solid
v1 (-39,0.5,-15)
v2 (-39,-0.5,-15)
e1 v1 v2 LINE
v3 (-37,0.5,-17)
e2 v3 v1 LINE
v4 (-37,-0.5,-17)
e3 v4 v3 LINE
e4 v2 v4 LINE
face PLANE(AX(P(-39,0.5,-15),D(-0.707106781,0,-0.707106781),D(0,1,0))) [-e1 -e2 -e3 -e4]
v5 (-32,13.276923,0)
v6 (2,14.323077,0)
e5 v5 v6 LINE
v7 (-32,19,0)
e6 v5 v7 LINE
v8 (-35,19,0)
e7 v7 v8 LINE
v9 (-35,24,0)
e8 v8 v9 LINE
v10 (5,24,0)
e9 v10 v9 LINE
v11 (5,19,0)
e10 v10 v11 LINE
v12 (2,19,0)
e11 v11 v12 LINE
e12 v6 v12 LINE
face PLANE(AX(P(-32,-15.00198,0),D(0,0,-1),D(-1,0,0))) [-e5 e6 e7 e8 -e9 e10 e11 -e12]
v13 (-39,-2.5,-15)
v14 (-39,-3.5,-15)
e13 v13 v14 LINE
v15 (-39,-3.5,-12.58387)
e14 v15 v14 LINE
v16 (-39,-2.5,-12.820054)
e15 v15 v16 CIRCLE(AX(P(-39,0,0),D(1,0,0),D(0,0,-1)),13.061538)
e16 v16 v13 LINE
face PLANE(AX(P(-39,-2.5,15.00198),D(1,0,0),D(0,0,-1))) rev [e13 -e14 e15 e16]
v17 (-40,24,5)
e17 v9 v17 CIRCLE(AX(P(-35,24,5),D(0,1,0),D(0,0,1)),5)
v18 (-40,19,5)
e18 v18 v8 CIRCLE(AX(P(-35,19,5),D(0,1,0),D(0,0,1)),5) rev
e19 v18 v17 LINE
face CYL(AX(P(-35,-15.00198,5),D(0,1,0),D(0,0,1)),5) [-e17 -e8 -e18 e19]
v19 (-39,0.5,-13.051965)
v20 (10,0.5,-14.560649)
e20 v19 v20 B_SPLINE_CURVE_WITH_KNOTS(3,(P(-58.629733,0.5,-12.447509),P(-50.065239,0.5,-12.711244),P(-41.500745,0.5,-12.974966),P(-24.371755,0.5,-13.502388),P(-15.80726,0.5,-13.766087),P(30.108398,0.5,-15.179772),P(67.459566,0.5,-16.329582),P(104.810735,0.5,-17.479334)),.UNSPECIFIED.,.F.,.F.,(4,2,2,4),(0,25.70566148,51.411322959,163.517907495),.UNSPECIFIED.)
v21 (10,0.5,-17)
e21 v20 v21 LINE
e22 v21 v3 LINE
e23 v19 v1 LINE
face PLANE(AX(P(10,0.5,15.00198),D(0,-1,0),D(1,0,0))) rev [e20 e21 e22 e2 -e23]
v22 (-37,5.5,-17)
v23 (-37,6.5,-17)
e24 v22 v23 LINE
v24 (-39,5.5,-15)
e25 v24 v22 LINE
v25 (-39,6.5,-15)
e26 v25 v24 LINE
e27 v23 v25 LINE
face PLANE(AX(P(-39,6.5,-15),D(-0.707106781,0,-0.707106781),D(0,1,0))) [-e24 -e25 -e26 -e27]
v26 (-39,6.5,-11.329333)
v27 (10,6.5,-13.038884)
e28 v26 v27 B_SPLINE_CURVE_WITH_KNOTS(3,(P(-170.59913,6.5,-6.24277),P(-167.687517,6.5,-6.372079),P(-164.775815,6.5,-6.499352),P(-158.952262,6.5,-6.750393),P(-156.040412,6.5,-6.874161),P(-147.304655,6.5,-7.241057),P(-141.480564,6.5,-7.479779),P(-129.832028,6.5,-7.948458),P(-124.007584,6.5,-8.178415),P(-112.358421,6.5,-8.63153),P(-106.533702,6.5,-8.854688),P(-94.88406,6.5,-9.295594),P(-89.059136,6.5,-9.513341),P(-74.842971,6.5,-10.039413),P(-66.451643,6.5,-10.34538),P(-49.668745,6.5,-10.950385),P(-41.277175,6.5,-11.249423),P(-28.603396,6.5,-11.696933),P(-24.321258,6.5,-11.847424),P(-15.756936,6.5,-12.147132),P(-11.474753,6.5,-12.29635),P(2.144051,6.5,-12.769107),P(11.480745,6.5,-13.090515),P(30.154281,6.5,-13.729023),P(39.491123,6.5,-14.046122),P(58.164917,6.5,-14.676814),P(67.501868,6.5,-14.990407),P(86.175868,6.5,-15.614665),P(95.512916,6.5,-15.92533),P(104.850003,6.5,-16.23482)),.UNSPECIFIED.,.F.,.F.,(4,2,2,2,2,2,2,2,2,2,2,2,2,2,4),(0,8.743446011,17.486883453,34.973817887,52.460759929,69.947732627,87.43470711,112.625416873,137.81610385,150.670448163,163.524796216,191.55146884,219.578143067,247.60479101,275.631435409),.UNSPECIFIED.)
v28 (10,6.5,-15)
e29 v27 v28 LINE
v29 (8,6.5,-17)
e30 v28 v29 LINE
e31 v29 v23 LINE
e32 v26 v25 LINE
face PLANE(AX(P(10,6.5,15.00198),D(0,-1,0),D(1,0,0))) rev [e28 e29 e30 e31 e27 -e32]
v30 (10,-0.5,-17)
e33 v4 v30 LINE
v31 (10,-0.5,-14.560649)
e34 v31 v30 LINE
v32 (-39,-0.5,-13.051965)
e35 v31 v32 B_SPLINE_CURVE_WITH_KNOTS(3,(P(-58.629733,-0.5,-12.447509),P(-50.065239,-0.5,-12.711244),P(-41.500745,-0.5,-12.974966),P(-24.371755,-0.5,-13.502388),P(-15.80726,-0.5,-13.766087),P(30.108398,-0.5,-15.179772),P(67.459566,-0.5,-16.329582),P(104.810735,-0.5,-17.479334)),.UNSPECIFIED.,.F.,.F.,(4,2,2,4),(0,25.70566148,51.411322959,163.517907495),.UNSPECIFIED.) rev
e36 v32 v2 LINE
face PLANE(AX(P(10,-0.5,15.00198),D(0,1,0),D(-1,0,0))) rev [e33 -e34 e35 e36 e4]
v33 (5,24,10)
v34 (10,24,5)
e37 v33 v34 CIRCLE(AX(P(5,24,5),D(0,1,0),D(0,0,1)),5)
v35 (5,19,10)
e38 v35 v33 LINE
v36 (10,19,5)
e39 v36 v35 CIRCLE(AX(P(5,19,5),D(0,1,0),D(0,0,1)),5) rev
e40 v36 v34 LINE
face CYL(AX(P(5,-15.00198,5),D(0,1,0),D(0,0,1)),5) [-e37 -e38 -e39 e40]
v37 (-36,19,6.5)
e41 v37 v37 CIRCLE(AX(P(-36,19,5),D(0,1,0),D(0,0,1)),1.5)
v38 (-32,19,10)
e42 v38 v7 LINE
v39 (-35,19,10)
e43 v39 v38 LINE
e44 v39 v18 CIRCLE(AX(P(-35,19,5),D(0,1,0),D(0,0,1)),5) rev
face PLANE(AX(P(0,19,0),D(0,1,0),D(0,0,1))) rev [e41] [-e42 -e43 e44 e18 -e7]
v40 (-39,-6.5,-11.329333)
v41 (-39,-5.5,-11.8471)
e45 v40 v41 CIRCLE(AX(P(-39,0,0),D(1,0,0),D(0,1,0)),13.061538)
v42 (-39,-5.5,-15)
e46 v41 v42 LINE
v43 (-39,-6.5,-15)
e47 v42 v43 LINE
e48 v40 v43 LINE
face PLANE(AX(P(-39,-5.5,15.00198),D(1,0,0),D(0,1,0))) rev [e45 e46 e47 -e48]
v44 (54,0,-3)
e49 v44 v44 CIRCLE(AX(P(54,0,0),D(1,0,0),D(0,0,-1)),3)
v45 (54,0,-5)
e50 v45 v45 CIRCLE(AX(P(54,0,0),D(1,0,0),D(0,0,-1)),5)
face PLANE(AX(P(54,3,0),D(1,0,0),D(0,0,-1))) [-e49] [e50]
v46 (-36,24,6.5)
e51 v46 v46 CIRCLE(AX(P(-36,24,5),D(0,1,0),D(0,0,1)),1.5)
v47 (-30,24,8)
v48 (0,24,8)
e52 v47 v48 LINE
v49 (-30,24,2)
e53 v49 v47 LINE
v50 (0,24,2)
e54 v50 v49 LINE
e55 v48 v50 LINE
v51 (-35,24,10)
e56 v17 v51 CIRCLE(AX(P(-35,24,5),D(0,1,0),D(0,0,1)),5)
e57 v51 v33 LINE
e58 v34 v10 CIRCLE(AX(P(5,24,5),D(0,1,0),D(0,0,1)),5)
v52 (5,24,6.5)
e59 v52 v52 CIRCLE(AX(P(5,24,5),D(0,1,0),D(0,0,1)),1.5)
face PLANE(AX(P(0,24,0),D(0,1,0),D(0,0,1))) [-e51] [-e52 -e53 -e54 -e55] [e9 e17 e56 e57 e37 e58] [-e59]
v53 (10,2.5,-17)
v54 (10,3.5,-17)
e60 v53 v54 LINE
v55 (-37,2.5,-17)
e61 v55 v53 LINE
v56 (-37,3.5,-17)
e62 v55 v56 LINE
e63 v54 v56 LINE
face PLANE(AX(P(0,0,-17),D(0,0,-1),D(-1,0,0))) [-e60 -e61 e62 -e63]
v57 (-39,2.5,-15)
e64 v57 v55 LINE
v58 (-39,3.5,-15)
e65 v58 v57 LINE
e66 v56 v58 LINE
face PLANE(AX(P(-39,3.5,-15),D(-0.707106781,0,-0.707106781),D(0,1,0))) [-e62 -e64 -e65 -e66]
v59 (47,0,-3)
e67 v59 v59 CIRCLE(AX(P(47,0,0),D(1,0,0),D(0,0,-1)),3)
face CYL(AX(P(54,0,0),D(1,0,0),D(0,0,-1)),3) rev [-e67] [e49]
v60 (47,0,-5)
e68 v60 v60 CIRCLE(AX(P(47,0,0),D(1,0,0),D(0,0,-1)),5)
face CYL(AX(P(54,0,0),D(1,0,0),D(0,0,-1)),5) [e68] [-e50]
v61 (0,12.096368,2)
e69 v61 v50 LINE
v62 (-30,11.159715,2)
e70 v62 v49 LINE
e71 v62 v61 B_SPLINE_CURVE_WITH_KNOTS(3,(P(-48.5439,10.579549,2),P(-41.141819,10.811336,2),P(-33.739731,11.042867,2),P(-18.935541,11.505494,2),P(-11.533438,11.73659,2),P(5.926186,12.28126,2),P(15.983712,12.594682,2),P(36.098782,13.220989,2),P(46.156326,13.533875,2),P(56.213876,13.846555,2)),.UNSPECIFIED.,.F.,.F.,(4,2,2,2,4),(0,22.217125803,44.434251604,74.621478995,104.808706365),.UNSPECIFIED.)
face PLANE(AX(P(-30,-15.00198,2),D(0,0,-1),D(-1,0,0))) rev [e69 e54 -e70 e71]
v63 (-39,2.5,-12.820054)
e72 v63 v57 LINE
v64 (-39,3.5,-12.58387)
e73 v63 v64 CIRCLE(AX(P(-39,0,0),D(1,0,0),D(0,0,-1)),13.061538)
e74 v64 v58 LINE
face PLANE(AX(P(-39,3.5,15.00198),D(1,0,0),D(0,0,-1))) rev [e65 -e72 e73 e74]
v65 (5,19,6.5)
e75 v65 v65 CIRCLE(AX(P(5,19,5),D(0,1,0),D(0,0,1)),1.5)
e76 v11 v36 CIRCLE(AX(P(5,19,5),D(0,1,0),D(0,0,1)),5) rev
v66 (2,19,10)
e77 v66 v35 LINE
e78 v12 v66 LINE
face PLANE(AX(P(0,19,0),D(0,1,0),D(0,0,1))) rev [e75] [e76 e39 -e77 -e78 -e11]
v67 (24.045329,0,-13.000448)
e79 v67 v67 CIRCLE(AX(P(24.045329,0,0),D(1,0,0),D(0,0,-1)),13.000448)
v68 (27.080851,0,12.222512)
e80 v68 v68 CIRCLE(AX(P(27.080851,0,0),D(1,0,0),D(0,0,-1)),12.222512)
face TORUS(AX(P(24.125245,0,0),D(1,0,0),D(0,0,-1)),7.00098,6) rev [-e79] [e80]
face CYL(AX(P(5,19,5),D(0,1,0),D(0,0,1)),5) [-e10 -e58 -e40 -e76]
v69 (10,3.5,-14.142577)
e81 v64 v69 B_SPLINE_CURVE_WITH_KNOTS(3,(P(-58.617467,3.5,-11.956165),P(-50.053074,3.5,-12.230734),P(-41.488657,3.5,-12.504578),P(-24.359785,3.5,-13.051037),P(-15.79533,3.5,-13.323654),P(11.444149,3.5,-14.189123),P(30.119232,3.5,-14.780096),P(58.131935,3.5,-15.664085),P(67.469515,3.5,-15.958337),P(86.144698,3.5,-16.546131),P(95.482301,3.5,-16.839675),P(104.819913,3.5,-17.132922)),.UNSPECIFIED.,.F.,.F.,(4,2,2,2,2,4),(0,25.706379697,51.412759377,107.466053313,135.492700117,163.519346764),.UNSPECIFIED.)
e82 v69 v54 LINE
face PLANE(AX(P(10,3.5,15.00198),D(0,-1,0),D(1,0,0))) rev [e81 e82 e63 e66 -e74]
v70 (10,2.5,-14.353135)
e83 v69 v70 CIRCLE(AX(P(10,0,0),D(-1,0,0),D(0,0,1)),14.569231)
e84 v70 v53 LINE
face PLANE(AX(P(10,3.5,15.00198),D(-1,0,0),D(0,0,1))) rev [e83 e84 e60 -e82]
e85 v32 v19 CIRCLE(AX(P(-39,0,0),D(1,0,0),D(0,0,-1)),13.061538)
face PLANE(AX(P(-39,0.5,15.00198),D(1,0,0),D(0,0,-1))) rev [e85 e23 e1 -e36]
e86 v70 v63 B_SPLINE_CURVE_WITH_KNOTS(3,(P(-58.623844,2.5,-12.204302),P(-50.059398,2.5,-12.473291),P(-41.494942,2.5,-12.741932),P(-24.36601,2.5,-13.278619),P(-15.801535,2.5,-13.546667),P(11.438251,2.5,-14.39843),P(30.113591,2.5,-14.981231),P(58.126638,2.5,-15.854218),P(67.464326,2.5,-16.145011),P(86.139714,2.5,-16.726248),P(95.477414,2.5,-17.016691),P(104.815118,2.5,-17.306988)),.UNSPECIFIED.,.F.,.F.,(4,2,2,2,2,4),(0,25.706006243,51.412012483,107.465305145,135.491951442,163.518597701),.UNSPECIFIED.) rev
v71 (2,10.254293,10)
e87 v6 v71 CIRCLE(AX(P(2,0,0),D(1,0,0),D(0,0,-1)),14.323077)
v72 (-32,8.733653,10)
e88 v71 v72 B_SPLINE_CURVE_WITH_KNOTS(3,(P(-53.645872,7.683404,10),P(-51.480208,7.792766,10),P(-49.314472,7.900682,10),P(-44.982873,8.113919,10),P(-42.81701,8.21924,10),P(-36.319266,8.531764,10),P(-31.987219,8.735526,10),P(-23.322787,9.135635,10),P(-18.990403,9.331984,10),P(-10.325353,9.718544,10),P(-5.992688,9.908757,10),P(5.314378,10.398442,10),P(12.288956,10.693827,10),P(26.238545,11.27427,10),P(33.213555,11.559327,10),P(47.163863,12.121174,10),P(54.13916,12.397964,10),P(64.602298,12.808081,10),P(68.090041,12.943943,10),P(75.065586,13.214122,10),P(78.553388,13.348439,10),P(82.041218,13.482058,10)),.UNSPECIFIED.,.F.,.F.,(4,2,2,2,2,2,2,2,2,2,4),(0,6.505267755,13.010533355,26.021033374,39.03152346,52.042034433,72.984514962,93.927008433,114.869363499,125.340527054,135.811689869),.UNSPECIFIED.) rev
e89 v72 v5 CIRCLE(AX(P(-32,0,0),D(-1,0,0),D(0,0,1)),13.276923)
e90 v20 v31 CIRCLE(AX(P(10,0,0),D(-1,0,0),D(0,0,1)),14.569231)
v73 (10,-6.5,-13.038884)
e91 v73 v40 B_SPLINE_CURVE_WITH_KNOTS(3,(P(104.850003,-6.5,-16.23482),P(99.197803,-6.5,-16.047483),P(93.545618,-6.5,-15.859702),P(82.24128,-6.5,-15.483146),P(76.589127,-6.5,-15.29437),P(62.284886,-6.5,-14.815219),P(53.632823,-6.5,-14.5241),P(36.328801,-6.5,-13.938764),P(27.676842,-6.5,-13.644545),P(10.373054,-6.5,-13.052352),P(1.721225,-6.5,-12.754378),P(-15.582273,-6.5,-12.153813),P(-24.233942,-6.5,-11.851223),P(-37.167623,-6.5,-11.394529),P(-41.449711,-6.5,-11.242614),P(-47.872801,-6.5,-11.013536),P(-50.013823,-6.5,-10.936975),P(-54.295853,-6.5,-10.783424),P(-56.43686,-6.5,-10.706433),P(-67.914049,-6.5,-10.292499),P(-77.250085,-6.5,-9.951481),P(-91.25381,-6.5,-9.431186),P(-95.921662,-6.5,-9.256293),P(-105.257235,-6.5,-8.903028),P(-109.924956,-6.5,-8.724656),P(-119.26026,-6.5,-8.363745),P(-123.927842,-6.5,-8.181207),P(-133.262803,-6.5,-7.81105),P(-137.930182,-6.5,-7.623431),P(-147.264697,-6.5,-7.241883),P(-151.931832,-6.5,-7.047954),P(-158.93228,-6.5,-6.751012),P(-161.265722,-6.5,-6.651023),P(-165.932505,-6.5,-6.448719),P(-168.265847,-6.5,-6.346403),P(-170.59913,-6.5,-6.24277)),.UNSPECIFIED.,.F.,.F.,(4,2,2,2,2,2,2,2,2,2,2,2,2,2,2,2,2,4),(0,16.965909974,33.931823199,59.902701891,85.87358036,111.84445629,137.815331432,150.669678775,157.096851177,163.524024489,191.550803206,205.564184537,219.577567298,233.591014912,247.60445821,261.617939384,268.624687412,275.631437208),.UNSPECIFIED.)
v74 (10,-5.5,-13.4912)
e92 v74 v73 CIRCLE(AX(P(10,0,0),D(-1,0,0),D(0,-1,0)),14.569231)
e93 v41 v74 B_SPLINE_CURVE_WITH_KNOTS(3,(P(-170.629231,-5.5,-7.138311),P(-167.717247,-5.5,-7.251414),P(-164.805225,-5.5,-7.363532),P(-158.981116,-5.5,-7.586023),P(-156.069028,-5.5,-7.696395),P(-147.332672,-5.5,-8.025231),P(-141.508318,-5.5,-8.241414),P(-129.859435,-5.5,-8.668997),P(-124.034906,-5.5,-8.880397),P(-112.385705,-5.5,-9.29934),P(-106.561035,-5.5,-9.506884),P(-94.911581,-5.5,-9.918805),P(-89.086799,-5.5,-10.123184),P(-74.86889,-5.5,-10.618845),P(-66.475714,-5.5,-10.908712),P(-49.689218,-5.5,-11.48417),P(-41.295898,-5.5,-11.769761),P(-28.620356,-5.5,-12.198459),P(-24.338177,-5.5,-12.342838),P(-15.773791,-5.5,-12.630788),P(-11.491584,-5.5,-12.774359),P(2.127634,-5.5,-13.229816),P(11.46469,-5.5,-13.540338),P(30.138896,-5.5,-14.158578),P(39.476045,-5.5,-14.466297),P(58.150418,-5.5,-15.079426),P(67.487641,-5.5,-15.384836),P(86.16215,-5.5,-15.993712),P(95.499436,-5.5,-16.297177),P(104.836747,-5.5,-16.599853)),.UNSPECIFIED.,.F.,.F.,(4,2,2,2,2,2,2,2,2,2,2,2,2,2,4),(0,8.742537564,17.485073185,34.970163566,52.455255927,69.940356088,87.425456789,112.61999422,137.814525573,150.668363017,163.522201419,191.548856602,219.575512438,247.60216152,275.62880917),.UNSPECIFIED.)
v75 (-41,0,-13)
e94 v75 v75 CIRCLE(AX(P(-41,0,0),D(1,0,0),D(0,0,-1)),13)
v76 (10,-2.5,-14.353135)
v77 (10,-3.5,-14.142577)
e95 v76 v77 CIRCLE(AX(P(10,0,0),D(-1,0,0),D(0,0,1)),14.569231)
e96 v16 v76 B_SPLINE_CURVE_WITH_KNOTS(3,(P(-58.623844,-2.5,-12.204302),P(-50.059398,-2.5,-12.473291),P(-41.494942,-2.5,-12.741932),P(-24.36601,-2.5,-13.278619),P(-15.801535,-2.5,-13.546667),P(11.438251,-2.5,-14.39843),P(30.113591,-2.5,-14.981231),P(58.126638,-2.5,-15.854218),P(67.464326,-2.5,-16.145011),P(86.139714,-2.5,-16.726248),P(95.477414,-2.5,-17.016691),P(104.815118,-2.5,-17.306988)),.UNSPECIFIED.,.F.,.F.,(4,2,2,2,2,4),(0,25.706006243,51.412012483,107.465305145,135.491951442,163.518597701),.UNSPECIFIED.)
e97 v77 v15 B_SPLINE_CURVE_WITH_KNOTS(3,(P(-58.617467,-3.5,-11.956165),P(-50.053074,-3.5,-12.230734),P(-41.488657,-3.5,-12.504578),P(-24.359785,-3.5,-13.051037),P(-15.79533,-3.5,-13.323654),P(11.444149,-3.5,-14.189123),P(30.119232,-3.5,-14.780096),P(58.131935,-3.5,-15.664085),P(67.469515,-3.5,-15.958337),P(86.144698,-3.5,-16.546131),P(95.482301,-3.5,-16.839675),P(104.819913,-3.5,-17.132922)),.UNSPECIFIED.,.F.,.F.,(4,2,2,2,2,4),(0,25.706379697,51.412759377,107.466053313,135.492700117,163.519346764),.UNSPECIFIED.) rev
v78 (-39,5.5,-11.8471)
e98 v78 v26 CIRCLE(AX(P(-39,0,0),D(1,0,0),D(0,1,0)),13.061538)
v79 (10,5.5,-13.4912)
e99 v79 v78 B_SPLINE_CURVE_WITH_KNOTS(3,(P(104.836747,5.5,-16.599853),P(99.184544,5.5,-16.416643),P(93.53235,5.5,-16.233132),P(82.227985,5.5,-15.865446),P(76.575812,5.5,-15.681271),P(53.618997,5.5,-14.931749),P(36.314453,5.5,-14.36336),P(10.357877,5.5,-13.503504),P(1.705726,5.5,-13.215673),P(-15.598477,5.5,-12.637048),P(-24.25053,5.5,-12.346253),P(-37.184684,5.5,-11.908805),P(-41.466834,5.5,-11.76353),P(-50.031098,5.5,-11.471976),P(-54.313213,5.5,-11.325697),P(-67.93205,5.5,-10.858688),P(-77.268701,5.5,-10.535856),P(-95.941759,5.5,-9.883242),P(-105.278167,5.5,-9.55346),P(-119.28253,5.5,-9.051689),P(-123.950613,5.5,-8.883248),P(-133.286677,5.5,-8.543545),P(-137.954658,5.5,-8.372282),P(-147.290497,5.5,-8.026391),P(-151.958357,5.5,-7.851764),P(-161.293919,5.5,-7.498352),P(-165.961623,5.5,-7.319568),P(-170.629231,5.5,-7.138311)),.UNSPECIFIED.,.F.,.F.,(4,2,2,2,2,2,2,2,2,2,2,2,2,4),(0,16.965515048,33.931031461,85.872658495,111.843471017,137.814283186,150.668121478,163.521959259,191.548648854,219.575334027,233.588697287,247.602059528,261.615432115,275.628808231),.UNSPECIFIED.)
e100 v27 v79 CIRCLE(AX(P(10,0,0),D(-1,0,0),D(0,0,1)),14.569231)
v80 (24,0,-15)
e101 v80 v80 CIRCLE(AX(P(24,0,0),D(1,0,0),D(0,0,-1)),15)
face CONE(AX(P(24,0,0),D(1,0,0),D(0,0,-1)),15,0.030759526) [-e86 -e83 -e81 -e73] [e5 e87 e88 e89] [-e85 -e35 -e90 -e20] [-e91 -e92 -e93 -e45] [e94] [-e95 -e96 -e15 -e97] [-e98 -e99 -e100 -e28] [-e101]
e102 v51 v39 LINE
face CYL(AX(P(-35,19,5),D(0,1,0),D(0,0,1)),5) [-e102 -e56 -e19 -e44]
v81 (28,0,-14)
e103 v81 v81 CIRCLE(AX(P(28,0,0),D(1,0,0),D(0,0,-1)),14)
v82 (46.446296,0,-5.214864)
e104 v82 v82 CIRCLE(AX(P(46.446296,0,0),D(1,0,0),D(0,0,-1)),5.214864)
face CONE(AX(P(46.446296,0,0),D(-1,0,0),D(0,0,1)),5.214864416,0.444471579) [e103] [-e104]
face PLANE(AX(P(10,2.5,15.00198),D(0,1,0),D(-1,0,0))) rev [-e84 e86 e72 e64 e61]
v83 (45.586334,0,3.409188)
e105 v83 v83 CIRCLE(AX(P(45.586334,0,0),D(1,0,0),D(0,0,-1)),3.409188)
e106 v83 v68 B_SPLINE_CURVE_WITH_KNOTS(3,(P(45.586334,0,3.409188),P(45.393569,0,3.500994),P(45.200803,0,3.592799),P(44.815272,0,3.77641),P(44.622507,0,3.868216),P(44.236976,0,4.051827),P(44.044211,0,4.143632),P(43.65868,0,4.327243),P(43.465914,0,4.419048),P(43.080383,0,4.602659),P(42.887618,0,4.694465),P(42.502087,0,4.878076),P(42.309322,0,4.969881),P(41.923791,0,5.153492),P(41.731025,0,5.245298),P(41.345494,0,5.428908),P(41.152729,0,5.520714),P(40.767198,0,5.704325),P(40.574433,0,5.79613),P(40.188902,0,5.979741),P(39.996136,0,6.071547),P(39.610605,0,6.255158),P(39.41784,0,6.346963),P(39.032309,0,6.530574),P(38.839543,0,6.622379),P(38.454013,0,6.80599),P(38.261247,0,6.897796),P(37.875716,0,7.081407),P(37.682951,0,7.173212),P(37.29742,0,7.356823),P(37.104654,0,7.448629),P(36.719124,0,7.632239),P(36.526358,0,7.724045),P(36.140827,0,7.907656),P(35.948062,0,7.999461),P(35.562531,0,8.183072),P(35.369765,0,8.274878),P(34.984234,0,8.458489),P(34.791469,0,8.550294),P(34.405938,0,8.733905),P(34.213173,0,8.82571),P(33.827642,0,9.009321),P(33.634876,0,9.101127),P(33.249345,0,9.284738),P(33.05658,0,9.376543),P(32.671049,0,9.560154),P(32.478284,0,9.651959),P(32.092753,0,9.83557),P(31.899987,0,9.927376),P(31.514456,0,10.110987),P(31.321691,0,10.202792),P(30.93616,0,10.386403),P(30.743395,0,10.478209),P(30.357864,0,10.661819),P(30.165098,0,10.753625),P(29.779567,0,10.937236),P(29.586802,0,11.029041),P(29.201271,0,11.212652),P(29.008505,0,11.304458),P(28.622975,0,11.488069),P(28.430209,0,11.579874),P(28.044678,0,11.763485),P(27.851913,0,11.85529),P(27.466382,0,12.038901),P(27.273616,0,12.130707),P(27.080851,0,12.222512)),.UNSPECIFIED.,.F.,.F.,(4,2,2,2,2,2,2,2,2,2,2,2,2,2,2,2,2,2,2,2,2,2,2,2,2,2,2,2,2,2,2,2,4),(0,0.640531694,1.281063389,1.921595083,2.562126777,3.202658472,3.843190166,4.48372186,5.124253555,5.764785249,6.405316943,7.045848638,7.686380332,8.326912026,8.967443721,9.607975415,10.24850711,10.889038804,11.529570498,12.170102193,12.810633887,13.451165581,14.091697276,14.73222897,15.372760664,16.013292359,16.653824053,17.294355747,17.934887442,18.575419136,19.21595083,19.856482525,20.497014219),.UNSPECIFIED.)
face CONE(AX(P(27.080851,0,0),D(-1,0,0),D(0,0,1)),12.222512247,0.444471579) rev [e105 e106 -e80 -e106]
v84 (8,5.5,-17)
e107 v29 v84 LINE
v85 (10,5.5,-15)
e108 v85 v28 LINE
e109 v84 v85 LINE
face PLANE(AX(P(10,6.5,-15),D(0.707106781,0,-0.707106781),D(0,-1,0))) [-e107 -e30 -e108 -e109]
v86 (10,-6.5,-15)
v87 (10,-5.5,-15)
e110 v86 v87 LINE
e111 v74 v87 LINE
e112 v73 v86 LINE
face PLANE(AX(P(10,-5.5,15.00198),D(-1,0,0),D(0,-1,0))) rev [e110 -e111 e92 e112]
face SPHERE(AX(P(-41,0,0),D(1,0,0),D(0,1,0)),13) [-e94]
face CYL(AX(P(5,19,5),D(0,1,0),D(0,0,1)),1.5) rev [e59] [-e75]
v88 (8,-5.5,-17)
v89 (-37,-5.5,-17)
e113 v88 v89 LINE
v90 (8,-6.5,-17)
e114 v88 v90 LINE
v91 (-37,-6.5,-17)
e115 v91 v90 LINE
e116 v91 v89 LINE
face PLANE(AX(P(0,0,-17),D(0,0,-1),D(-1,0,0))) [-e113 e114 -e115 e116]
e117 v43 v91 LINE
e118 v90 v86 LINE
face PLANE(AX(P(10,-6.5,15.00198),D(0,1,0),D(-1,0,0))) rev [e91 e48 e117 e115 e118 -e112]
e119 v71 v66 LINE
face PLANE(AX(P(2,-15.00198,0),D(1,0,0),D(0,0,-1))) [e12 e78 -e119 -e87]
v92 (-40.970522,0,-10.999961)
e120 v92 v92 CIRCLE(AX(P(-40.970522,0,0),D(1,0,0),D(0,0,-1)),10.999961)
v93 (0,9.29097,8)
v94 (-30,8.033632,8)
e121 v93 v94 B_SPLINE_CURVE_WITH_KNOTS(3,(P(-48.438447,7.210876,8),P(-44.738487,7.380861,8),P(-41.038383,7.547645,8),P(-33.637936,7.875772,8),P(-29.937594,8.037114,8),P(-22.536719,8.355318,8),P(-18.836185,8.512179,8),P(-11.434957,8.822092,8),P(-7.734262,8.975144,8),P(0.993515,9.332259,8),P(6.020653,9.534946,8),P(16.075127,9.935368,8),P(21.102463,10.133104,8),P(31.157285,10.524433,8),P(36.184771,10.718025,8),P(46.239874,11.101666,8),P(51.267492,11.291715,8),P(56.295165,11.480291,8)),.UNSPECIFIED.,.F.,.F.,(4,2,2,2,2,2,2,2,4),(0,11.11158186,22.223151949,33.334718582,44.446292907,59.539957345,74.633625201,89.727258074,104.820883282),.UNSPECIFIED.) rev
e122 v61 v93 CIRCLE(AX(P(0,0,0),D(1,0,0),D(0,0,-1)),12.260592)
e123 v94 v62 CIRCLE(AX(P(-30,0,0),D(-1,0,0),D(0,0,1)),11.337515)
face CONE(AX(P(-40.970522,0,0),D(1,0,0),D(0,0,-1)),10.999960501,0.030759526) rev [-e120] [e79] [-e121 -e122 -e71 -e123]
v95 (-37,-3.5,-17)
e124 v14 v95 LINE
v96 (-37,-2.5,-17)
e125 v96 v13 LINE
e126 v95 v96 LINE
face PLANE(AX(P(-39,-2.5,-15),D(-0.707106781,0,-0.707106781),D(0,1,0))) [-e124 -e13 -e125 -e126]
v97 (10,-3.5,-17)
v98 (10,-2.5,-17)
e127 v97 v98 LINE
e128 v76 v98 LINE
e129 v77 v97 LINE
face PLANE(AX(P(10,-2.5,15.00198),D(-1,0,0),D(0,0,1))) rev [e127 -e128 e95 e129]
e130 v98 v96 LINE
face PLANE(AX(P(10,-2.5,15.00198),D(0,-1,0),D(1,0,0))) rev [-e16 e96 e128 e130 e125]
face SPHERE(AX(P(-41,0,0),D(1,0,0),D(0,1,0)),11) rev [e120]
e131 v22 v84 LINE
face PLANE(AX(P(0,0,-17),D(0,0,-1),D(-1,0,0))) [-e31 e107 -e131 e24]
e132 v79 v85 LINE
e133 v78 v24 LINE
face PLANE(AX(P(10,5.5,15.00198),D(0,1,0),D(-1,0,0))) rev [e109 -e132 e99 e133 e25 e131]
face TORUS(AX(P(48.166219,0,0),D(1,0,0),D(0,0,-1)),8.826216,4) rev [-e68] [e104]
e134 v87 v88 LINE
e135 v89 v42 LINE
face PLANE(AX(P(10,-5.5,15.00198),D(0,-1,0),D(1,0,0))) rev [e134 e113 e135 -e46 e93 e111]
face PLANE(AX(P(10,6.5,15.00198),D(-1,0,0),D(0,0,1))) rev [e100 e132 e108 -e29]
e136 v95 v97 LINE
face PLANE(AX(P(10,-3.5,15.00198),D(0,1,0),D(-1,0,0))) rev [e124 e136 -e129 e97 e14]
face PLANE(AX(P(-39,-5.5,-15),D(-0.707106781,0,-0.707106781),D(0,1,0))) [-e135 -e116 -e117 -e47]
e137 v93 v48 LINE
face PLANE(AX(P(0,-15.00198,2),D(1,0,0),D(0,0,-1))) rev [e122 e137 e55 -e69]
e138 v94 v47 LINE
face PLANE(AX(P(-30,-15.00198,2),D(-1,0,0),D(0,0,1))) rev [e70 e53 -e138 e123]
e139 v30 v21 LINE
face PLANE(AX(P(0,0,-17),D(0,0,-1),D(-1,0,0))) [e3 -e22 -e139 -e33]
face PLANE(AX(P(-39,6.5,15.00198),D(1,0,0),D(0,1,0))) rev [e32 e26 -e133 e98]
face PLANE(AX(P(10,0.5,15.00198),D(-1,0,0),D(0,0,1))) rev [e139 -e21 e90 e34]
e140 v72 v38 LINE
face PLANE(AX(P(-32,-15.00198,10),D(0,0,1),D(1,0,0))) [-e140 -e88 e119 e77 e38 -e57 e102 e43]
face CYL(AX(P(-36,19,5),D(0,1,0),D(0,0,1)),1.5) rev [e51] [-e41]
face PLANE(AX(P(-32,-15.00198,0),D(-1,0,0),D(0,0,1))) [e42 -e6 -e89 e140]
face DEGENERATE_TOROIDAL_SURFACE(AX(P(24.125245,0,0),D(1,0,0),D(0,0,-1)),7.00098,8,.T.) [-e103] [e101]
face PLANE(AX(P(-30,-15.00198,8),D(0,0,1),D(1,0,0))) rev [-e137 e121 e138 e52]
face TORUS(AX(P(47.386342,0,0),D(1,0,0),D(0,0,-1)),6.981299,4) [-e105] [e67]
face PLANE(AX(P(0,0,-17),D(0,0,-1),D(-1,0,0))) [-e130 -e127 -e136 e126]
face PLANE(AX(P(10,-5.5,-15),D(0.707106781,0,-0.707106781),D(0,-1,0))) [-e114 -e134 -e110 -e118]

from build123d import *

# Parameters (mm, degrees)
BOSS_EXTRUDE1_REACH = 70.28
SKETCH2_W           = 34
SKETCH2_H           = 10
SKETCH2_W_2         = 30
SKETCH2_H_2         = 6
SKETCH4_W           = 30
SKETCH4_H           = 6
CUT_EXTRUDE4_DEPTH  = 20
SKETCH5_W           = 50
SKETCH5_H           = 10
SKETCH5_R           = 1.5
SKETCH5_W_2         = 30
SKETCH5_H_2         = 6
BOSS_EXTRUDE2_DEPTH = 5
FILLET1_R           = 5
BOSS_EXTRUDE3_REACH = 69.202
SKETCH6_W           = 49
SKETCH6_H           = 1
CHAMFER1_SIZE       = 2


with BuildPart() as part:
    # Sketch1 → Revolve1 (revolve)
    with BuildSketch(Plane.XY, mode=Mode.PRIVATE) as revolve1_sk:
        with BuildLine():
            Line((-41, 13), (24, 15))
            ThreePointArc((24, 15), (26.065530114, 14.762120457), (28, 14))
            Line((28, 14), (46.44629603, 5.214864416))
            ThreePointArc((46.44629603, 5.214864416), (46.719154543, 5.09714106), (47, 5))
            Line((47, 5), (54, 5))
            Line((54, 5), (54, 3))
            Line((54, 3), (52, 3))
            Line((52, 3), (47, 3))
            ThreePointArc((47, 3), (46.274186419, 3.139019493), (45.586334306, 3.409188411))
            Line((45.586334306, 3.409188411), (27.080850933, 12.222512247))
            ThreePointArc((27.080850933, 12.222512247), (25.614773207, 12.813149248), (24.045329018, 13.000448217))
            Line((24.045329018, 13.000448217), (-40.970521752, 10.999960501))
            ThreePointArc((-40.970521752, 10.999960501), (-48.767745467, 7.788589754), (-52, 0))
            Line((-52, 0), (-54, 0))
            ThreePointArc((-54, 0), (-50.192388155, 9.192388155), (-41, 13))
        make_face()
    revolve(revolve1_sk.sketch.rotate(Axis((54, 0, 0), (-1, 0, 0)), 90), axis=Axis((54, 0, 0), (-1, 0, 0)))

    # Boss-Extrude1: up to this cone (the profile starts outside it)
    boss_extrude1_end = Plane(origin=(-15, 0, 0), z_dir=(1, 0, 0)) * Cone(11.197538462, 16.402461538, 169.16, mode=Mode.PRIVATE)
    # Sketch2 → Boss-Extrude1 (add, up to the surface)
    with BuildSketch(Plane(origin=(0, 24, 0), x_dir=(1, 0, 0), z_dir=(0, 1, 0)), mode=Mode.PRIVATE) as boss_extrude1_sk1:
        with Locations((-15, -5)):
            Rectangle(SKETCH2_W, SKETCH2_H)
        with Locations((-15, -5)):
            Rectangle(SKETCH2_W_2, SKETCH2_H_2, mode=Mode.SUBTRACT)
    boss_extrude1_tool1 = extrude(boss_extrude1_sk1.sketch, amount=-BOSS_EXTRUDE1_REACH, mode=Mode.PRIVATE) - boss_extrude1_end
    add(boss_extrude1_tool1.solids().sort_by_distance((-15, 24, 0.354401))[0])

    # Sketch4 → Cut-Extrude4 (cut)
    with BuildSketch(Plane(origin=(0, 24, 0), x_dir=(1, 0, 0), z_dir=(0, 1, 0))):
        with Locations((-15, -5)):
            Rectangle(SKETCH4_W, SKETCH4_H)
    extrude(amount=-CUT_EXTRUDE4_DEPTH, mode=Mode.SUBTRACT)

    # Sketch5 → Boss-Extrude2 (add)
    with BuildSketch(Plane(origin=(0, 24, 0), x_dir=(1, 0, 0), z_dir=(0, 1, 0))):
        with Locations((-15, -5)):
            Rectangle(SKETCH5_W, SKETCH5_H)
        with Locations(Location((-36, -5, 0), (0, 0, 270))):
            Circle(SKETCH5_R, mode=Mode.SUBTRACT)
        with Locations(Location((5, -5, 0), (0, 0, 270))):
            Circle(SKETCH5_R, mode=Mode.SUBTRACT)
        with Locations((-15, -5)):
            Rectangle(SKETCH5_W_2, SKETCH5_H_2, mode=Mode.SUBTRACT)
    extrude(amount=-BOSS_EXTRUDE2_DEPTH)

    # Fillet1
    fillet1_edges = [part.edges().sort_by_distance(p)[0] for p in [
        (10, 21.5, 10),
        (10, 21.5, 0),
        (-40, 21.5, 0),
        (-40, 21.5, 10),
    ]]
    fillet(fillet1_edges, radius=FILLET1_R - 0.0001)  # a hair under: the kernel refuses the full size

    # Boss-Extrude3: up to this cone (the profile starts outside it)
    boss_extrude3_end = Plane(origin=(-14.5, 0, 0), z_dir=(1, 0, 0)) * Cone(11.245618935, 16.385150296, 167.034769231, mode=Mode.PRIVATE)
    # Sketch6 → Boss-Extrude3 (add, up to the surface)
    with BuildSketch(Plane.XY.offset(-17), mode=Mode.PRIVATE) as boss_extrude3_sk1:
        with Locations((-14.5, 6)):
            Rectangle(SKETCH6_W, SKETCH6_H)
    boss_extrude3_tool1 = extrude(boss_extrude3_sk1.sketch, amount=BOSS_EXTRUDE3_REACH, mode=Mode.PRIVATE) - boss_extrude3_end
    add(boss_extrude3_tool1.solids().sort_by_distance((-14.5, 6, -17))[0])
    # Sketch6 → Boss-Extrude3 (add, up to the surface)
    with BuildSketch(Plane.XY.offset(-17), mode=Mode.PRIVATE) as boss_extrude3_sk2:
        with Locations((-14.5, 3)):
            Rectangle(SKETCH6_W, SKETCH6_H)
    boss_extrude3_tool2 = extrude(boss_extrude3_sk2.sketch, amount=BOSS_EXTRUDE3_REACH, mode=Mode.PRIVATE) - boss_extrude3_end
    add(boss_extrude3_tool2.solids().sort_by_distance((-14.5, 3, -17))[0])
    # Sketch6 → Boss-Extrude3 (add, up to the surface)
    with BuildSketch(Plane.XY.offset(-17), mode=Mode.PRIVATE) as boss_extrude3_sk3:
        with Locations((-14.5, 0)):
            Rectangle(SKETCH6_W, SKETCH6_H)
    boss_extrude3_tool3 = extrude(boss_extrude3_sk3.sketch, amount=BOSS_EXTRUDE3_REACH, mode=Mode.PRIVATE) - boss_extrude3_end
    add(boss_extrude3_tool3.solids().sort_by_distance((-14.5, 0, -17))[0])
    # Sketch6 → Boss-Extrude3 (add, up to the surface)
    with BuildSketch(Plane.XY.offset(-17), mode=Mode.PRIVATE) as boss_extrude3_sk4:
        with Locations((-14.5, -3)):
            Rectangle(SKETCH6_W, SKETCH6_H)
    boss_extrude3_tool4 = extrude(boss_extrude3_sk4.sketch, amount=BOSS_EXTRUDE3_REACH, mode=Mode.PRIVATE) - boss_extrude3_end
    add(boss_extrude3_tool4.solids().sort_by_distance((-14.5, -3, -17))[0])
    # Sketch6 → Boss-Extrude3 (add, up to the surface)
    with BuildSketch(Plane.XY.offset(-17), mode=Mode.PRIVATE) as boss_extrude3_sk5:
        with Locations((-14.5, -6)):
            Rectangle(SKETCH6_W, SKETCH6_H)
    boss_extrude3_tool5 = extrude(boss_extrude3_sk5.sketch, amount=BOSS_EXTRUDE3_REACH, mode=Mode.PRIVATE) - boss_extrude3_end
    add(boss_extrude3_tool5.solids().sort_by_distance((-14.5, -6, -17))[0])

    # Chamfer1
    chamfer1_edges = [part.edges().sort_by_distance(p)[0] for p in [
        (10, 6, -17),
        (-39, 6, -17),
        (-39, 3, -17),
        (-39, 0, -17),
        (-39, -3, -17),
        (10, -6, -17),
        (-39, -6, -17),
    ]]
    chamfer(chamfer1_edges, length=CHAMFER1_SIZE)


solid = part.part
